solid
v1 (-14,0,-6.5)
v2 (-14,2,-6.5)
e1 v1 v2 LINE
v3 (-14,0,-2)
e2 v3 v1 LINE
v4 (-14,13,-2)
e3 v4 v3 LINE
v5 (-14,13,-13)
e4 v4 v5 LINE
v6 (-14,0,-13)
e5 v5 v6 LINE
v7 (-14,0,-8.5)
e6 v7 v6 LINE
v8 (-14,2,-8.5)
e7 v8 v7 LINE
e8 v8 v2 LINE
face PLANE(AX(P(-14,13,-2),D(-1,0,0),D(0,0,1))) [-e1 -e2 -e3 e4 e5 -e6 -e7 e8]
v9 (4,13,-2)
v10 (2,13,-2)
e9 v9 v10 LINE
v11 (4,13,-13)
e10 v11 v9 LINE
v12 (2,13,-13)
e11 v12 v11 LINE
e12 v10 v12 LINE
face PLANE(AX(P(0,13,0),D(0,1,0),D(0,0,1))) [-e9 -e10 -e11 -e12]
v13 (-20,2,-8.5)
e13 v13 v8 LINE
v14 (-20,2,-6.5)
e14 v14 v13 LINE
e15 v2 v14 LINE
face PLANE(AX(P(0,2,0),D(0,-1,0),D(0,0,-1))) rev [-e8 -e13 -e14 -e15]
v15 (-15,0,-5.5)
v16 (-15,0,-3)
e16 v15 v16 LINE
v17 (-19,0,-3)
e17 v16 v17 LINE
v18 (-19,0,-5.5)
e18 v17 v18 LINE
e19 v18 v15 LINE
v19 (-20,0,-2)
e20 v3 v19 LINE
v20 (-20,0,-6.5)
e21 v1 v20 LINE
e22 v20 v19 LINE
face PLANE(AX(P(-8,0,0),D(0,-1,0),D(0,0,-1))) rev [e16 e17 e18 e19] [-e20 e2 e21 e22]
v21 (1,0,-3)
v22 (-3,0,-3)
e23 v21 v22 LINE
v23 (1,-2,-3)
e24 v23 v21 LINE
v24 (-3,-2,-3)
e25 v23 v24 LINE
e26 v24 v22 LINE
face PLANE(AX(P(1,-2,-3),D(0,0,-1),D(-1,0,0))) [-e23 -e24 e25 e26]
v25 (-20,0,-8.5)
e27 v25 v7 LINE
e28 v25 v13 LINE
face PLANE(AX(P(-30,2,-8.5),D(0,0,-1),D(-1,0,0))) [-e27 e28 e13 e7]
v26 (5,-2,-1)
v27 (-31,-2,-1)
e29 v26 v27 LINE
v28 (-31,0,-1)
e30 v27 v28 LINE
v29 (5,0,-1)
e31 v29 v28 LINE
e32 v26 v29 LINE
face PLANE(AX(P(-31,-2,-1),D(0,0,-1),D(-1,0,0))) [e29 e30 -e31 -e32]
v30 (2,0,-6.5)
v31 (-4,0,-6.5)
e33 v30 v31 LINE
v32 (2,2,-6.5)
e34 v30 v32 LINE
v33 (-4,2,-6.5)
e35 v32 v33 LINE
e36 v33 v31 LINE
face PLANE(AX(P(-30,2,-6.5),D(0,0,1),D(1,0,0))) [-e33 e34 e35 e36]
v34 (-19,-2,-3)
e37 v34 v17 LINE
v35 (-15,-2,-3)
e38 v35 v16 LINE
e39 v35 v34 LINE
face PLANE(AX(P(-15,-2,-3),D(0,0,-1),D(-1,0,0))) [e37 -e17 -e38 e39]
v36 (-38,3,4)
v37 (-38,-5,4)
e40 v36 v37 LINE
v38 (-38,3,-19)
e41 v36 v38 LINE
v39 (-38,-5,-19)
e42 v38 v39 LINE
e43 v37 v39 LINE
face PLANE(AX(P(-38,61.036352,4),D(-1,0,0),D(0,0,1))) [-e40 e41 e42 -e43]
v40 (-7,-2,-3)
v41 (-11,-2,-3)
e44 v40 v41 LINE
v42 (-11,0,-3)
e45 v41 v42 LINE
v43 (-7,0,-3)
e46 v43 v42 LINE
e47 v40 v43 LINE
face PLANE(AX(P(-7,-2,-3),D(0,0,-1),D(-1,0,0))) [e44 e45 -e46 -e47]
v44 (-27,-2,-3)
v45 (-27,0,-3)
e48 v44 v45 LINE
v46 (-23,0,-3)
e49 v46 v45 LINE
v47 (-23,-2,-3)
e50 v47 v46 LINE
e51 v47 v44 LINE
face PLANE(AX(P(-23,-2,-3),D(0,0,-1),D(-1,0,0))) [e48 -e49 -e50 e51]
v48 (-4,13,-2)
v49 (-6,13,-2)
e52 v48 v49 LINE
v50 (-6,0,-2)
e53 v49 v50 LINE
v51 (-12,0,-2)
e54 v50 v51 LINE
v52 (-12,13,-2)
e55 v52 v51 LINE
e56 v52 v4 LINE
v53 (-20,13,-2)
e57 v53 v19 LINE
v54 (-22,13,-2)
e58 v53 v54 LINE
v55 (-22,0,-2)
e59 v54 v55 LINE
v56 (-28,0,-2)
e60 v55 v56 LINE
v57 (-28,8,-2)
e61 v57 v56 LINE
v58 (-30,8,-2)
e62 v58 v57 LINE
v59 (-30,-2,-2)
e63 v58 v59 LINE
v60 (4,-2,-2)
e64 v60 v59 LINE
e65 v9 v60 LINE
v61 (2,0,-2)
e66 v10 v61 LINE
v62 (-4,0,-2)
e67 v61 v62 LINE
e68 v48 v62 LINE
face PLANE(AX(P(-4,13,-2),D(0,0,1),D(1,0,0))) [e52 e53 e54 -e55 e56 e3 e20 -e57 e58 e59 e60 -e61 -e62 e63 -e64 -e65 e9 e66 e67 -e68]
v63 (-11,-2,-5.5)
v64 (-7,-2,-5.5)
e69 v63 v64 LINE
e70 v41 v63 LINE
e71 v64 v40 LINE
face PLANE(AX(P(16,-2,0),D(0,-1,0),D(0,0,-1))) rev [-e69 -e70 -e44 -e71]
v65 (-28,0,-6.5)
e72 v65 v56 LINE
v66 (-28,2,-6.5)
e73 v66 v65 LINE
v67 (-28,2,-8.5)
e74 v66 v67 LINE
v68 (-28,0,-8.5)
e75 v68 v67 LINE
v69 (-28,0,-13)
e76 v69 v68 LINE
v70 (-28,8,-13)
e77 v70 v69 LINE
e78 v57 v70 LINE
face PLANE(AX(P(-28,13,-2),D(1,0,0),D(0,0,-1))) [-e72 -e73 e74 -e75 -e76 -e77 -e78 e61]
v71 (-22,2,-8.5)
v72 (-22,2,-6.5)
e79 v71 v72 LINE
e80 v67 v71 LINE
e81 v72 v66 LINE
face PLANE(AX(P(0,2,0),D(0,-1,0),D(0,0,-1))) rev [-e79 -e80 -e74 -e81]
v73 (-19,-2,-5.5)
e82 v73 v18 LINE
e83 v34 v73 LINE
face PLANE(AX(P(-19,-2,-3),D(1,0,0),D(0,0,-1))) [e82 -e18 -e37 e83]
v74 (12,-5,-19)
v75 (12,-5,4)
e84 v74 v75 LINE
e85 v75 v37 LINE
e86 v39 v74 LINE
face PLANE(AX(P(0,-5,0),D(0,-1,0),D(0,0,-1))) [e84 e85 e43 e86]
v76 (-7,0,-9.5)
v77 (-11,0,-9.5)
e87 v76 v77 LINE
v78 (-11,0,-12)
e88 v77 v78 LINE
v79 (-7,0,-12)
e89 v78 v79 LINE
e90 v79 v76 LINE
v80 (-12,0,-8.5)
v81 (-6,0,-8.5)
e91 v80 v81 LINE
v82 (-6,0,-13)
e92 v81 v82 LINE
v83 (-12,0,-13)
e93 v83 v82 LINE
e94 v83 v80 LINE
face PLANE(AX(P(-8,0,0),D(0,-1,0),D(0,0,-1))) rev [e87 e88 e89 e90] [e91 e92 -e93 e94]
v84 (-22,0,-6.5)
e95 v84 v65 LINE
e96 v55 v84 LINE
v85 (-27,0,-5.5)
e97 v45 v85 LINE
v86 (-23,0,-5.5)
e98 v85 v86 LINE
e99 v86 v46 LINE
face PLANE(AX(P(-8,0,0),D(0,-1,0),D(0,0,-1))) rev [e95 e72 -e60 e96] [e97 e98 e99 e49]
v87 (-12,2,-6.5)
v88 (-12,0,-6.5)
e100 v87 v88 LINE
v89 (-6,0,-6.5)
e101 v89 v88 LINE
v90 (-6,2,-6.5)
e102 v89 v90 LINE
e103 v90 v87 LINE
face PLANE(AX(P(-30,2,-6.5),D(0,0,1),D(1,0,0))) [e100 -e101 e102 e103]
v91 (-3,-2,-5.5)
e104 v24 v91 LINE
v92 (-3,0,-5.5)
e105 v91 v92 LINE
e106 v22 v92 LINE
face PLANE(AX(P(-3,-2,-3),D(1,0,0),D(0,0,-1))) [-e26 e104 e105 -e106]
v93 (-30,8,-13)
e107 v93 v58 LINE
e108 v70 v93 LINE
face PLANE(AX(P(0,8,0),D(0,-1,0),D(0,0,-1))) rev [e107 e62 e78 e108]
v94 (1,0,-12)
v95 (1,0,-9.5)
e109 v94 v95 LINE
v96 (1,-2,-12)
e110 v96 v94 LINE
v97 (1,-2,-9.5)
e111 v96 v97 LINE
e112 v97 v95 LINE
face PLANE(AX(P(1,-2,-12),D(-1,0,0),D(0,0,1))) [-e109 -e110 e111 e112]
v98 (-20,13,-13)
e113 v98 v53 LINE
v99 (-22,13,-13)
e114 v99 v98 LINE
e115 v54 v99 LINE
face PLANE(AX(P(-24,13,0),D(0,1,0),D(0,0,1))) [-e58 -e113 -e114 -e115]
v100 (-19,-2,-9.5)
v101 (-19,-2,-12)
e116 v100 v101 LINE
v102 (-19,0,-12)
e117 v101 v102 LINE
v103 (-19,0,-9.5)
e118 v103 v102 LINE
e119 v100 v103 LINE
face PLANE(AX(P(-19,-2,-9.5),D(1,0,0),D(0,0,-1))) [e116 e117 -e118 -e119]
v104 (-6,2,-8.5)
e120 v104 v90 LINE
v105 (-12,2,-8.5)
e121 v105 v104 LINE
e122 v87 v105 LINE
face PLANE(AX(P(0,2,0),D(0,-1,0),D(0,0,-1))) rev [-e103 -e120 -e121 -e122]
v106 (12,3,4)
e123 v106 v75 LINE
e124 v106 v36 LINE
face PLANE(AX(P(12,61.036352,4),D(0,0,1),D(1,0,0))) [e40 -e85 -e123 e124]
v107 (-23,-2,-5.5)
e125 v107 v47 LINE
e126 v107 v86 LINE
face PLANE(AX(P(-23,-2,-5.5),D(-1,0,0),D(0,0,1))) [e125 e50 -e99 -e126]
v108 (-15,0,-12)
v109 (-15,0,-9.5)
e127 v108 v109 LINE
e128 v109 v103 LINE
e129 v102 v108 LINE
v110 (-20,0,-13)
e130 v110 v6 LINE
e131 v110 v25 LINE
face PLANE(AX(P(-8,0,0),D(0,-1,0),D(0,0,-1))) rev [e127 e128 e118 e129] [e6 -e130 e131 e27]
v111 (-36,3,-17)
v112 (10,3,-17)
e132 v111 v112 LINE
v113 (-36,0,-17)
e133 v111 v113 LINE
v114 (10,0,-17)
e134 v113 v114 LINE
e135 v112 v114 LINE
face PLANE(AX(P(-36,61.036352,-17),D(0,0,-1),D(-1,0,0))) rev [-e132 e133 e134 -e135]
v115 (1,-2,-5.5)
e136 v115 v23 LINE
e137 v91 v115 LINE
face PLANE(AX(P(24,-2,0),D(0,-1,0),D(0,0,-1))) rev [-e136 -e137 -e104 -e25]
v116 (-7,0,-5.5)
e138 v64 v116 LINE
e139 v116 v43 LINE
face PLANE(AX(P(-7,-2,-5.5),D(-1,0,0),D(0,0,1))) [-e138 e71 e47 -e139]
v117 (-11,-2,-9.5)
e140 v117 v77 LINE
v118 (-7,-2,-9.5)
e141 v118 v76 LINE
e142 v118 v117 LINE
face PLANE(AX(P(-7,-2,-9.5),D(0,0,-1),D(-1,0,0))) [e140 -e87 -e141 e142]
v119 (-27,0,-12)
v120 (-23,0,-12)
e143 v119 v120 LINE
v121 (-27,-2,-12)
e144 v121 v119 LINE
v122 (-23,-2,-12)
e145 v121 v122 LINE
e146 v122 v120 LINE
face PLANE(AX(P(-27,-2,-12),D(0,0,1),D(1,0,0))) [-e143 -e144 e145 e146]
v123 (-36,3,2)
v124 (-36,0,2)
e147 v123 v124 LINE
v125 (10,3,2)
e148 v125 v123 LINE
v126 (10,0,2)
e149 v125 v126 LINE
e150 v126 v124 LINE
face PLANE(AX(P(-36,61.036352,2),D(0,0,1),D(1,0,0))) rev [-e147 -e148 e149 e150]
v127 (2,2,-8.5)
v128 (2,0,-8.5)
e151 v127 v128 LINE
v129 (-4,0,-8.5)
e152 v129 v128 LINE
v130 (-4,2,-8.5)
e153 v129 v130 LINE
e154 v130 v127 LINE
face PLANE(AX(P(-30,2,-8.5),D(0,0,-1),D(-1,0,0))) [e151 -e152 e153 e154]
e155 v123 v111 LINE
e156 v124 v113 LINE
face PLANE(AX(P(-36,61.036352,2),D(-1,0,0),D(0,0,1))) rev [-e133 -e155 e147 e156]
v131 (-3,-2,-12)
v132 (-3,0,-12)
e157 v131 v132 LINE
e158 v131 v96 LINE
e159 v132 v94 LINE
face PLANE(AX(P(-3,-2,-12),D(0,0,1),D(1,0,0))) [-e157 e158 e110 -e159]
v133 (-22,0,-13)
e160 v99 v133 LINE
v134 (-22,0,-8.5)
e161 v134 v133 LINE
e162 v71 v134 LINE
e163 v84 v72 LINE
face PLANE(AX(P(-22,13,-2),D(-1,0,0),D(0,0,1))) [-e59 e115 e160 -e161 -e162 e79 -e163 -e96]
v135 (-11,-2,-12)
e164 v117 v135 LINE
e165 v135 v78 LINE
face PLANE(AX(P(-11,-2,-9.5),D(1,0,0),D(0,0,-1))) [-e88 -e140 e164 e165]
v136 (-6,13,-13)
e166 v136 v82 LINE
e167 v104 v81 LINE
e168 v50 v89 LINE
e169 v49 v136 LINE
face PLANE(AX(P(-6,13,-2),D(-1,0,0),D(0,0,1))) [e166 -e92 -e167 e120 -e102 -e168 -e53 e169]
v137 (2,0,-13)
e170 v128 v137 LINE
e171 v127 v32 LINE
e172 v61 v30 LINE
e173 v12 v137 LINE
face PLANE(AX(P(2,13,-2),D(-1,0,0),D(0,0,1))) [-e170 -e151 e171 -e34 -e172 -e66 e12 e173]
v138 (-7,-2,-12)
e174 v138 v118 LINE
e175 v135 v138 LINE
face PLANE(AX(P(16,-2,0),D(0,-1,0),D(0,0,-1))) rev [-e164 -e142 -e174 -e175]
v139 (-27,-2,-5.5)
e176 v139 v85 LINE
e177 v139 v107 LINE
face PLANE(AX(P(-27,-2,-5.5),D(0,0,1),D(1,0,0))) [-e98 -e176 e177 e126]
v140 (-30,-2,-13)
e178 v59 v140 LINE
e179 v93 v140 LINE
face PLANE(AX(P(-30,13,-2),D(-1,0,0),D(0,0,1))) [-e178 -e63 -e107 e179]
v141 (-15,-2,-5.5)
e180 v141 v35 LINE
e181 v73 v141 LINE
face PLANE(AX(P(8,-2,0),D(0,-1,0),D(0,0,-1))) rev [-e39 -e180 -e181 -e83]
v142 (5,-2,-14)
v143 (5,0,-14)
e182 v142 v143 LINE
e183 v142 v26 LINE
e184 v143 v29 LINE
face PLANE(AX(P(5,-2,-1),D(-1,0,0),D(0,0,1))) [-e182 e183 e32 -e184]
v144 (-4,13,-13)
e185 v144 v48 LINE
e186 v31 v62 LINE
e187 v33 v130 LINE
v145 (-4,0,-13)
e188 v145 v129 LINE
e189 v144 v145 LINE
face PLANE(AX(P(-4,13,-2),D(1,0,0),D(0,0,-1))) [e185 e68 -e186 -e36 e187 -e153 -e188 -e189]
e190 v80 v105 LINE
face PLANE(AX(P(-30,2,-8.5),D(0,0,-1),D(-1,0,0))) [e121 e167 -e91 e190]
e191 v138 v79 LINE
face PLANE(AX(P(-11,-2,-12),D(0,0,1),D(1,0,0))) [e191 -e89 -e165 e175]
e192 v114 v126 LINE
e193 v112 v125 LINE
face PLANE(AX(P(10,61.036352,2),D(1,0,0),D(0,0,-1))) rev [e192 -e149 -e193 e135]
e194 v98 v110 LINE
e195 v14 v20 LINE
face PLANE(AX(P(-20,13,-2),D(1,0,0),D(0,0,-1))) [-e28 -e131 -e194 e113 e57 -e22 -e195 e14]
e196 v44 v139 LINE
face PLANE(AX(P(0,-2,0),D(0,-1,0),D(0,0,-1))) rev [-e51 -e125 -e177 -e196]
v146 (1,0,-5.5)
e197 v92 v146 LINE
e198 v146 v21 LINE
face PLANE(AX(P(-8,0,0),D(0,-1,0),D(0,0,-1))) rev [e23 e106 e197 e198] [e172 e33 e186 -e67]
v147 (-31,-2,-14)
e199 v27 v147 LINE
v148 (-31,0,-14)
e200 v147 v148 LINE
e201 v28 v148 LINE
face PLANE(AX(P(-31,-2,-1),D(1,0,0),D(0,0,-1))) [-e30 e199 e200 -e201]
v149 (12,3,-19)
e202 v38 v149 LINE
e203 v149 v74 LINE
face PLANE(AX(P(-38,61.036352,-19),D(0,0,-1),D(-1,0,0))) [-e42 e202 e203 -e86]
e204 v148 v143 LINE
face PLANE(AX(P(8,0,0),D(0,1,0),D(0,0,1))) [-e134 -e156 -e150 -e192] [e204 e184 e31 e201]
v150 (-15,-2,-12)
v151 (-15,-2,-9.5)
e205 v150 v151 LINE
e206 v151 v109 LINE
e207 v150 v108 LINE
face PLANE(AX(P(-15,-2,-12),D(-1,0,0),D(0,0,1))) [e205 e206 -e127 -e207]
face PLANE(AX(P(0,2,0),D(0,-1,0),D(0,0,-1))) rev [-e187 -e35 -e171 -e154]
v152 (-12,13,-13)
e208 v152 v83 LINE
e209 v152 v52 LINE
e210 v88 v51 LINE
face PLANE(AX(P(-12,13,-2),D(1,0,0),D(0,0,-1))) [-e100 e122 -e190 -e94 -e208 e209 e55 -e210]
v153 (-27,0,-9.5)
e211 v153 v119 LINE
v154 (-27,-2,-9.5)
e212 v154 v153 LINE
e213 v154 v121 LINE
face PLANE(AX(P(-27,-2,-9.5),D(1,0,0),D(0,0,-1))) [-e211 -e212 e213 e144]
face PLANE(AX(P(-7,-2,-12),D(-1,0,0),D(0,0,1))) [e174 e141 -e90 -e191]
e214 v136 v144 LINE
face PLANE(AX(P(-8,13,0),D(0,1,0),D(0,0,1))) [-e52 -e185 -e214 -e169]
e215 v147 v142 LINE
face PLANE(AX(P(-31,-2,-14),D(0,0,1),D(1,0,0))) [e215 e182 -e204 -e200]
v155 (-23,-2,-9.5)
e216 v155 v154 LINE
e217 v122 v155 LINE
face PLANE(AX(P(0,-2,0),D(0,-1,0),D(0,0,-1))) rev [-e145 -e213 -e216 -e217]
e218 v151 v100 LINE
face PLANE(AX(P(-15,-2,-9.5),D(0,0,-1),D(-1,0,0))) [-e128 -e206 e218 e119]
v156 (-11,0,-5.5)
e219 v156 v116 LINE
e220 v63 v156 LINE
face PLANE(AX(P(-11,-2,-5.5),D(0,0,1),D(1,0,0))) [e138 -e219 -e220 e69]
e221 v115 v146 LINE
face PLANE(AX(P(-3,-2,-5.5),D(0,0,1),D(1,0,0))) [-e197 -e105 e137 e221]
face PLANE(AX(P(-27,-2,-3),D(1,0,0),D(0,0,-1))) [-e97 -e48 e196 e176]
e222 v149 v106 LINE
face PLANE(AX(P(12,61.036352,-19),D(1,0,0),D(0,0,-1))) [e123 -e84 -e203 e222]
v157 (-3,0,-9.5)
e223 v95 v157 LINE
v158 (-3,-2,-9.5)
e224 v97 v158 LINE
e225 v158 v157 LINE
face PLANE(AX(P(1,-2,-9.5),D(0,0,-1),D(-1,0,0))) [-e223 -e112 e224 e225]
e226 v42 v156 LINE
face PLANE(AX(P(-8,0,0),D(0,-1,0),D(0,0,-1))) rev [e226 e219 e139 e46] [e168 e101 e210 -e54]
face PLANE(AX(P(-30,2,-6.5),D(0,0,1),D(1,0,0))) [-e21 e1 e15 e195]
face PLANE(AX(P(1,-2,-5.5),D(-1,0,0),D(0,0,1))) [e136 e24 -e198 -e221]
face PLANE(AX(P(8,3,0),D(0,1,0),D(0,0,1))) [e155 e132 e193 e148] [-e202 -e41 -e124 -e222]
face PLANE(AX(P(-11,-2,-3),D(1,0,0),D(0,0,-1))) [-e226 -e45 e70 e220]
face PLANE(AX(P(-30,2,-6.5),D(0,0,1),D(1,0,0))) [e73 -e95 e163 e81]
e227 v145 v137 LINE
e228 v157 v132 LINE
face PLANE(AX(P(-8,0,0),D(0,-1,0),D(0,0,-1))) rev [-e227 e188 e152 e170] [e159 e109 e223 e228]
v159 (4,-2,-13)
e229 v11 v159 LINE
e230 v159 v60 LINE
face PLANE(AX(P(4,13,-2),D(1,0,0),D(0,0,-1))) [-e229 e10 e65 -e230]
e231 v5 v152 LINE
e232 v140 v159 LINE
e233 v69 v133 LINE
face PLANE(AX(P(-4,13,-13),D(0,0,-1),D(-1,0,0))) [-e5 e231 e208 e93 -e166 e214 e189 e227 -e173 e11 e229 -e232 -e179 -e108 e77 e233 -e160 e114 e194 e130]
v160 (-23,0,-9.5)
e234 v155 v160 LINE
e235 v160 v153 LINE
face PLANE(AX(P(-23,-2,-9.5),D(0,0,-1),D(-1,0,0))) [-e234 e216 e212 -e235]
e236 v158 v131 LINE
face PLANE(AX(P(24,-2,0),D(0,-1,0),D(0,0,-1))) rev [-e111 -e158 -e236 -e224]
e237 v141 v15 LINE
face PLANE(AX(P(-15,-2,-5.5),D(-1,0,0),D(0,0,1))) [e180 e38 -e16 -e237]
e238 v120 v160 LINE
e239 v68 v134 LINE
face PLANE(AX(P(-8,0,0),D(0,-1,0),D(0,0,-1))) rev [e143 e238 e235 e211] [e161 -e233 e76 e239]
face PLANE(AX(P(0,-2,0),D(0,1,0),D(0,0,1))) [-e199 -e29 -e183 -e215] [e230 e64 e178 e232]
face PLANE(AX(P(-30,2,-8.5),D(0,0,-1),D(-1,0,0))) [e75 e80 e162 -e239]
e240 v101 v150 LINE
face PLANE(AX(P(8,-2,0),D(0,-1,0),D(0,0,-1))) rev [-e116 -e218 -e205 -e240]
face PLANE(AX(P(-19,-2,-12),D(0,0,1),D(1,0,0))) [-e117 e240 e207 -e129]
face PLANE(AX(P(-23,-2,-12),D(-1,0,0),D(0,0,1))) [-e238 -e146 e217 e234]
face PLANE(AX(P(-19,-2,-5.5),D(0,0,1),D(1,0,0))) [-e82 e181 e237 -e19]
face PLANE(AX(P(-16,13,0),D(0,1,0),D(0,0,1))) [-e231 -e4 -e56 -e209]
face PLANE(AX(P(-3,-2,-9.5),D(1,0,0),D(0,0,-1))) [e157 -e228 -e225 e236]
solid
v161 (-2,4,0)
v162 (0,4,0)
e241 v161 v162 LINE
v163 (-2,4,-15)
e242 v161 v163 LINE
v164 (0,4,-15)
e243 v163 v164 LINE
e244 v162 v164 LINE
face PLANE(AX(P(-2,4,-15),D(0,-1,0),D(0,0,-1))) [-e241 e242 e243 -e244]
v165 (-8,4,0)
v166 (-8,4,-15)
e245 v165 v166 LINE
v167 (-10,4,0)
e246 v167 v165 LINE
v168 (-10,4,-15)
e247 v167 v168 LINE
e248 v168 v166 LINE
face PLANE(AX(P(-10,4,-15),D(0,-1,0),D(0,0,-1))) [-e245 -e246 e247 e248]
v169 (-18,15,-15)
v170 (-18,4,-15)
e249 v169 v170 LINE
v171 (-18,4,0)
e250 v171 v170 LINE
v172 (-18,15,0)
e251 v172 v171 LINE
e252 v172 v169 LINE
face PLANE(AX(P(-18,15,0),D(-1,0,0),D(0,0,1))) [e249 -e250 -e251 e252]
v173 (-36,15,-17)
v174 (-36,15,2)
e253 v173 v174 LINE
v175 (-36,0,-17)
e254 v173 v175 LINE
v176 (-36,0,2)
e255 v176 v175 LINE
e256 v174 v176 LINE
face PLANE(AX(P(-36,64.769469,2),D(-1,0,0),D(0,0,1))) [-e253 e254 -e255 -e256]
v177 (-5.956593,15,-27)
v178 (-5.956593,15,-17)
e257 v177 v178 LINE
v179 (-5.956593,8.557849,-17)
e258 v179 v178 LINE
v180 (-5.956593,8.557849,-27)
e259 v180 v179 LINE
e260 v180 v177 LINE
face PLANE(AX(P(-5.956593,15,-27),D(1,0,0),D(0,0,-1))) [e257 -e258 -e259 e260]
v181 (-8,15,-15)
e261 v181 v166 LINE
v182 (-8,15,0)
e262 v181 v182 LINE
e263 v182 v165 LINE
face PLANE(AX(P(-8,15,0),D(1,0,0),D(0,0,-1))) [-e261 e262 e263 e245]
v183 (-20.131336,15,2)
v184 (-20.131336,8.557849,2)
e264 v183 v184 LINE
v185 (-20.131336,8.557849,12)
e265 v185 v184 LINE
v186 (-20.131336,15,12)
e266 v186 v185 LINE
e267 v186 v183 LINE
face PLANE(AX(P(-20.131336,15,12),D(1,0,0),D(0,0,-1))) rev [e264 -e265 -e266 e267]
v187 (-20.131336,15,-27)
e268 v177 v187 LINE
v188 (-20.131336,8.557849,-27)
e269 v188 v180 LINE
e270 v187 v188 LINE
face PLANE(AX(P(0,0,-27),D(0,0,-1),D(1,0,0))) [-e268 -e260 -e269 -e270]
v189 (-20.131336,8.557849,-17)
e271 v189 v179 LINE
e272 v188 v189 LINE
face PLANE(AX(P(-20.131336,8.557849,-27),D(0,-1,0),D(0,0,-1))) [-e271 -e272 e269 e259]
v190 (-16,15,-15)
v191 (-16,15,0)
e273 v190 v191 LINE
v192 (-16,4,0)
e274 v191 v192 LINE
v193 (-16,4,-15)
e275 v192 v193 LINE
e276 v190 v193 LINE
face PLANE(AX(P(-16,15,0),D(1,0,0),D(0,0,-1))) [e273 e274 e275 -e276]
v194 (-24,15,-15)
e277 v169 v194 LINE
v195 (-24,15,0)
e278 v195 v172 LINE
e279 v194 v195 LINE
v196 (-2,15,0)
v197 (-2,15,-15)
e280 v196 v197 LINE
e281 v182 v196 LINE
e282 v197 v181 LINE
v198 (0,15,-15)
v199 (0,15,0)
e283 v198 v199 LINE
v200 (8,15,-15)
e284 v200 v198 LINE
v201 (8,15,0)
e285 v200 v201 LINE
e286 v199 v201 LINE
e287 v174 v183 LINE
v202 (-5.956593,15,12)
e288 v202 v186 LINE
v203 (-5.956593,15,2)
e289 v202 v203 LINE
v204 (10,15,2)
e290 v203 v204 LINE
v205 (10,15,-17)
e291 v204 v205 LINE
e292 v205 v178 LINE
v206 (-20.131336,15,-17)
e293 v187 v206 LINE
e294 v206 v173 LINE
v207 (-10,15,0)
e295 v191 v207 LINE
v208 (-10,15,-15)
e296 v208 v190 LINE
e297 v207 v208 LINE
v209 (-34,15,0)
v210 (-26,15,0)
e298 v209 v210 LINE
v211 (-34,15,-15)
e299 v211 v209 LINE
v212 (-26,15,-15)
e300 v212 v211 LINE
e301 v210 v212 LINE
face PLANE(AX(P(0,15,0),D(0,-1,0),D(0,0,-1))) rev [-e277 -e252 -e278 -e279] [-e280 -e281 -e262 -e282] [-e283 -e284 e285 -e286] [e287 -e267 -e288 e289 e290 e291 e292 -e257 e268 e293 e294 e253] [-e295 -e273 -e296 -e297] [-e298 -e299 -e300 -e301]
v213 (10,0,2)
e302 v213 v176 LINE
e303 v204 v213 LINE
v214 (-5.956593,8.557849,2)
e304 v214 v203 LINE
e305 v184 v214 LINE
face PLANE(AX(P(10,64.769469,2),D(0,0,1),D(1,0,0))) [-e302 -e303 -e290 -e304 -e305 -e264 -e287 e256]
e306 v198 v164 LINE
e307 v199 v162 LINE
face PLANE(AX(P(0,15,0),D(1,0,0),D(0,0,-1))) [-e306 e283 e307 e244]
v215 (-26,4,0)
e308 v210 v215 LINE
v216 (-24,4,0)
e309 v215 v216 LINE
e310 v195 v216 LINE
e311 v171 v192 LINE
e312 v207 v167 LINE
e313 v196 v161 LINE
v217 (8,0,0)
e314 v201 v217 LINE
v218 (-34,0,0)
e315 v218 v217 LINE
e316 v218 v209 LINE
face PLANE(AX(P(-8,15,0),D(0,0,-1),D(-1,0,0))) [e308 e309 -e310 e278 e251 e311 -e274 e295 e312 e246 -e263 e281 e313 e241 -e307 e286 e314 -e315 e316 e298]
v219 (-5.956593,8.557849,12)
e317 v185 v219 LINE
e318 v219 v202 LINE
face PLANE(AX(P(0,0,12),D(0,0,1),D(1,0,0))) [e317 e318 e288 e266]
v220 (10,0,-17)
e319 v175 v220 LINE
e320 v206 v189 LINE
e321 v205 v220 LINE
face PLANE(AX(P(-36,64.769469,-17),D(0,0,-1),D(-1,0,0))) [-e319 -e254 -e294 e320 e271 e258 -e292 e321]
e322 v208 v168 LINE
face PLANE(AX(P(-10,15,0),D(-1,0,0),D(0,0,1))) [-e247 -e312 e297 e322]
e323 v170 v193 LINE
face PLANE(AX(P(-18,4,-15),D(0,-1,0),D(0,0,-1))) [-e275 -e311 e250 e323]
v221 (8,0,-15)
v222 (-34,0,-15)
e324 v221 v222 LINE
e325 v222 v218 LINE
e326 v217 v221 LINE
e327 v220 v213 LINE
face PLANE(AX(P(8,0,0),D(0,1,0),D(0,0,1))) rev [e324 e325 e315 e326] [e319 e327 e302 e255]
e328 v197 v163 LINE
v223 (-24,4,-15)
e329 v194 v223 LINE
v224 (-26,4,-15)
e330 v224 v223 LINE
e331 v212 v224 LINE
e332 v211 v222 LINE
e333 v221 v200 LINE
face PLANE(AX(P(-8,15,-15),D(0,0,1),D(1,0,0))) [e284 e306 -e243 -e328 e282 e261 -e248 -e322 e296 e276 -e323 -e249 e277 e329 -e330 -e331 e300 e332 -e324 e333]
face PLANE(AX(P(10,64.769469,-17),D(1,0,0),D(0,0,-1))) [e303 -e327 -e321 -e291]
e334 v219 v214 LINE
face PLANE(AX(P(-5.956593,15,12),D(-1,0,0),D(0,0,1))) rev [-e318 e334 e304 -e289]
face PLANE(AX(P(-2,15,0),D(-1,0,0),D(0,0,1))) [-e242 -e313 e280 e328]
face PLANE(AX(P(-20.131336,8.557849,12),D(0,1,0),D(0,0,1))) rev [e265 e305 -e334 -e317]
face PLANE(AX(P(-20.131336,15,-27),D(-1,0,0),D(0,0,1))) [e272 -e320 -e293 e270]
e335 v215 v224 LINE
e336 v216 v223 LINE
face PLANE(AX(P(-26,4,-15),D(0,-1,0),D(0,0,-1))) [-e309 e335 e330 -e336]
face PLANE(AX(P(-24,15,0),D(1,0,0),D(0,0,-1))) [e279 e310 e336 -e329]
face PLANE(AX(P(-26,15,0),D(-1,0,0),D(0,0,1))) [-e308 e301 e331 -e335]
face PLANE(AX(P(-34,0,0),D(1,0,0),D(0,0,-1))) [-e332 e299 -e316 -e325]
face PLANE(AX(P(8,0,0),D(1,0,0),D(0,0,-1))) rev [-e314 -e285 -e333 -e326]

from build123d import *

# Parameters (mm, degrees)
SKETCH1_W                 = 6
SKETCH1_H                 = 15
BOSS_EXTRUDE1_DEPTH       = 15
SKETCH2_W                 = 2
SKETCH2_H                 = 11
CUT_EXTRUDE1_DEPTH        = 13
SKETCH3_W                 = 15
SKETCH3_H                 = 4
BOSS_EXTRUDE2_DEPTH       = 2
LPATTERN1_COUNT           = 5
LPATTERN1_PITCH           = 8
SKETCH6_W                 = 15
SKETCH6_H                 = 15
BOSS_EXTRUDE4_DEPTH       = 2
SKETCH8_W                 = 15
SKETCH8_H                 = 11
BOSS_EXTRUDE5_DEPTH       = 2
SKETCH9_W                 = 34
SKETCH9_H                 = 2
CUT_EXTRUDE2_DEPTH        = 2
SKETCH13_W                = 36
SKETCH13_H                = 13
SKETCH13_W_2              = 34
SKETCH13_H_2              = 11
BOSS_EXTRUDE9_DEPTH       = 2
SKETCH15_W                = 4
SKETCH15_H                = 2.5
BOSS_EXTRUDE10_DEPTH      = 2
LPATTERN2_COUNT           = 4
LPATTERN2_PITCH           = 8
BOSS_EXTRUDE11_DEPTH      = 5
BOSS_EXTRUDE11_DEPTH_BACK = 15
SKETCH17_W                = 46
SKETCH17_H                = 19
SPLIT2_START              = -5
SPLIT2_OUTLINE_W          = 46
SPLIT2_OUTLINE_H          = 19
SPLIT2_DEPTH              = 5
SPLIT2_2_OUTLINE_W        = 2
SPLIT2_2_OUTLINE_H        = 11
SPLIT2_2_DEPTH            = 13
SPLIT2_3_OUTLINE_W        = 6
SPLIT2_3_OUTLINE_H        = 2
SPLIT2_3_DEPTH            = 2
SPLIT2_START_2            = -13
SPLIT2_4_DEPTH            = 11
SPLIT2_START_3            = -17
SPLIT2_5_DEPTH            = 19
SPLIT2_6_OUTLINE_W        = 36
SPLIT2_6_OUTLINE_H        = 2
SPLIT2_6_DEPTH            = 3
SPLIT2_START_4            = -1
SPLIT2_7_OUTLINE_W        = 36
SPLIT2_7_OUTLINE_H        = 2
SPLIT2_7_DEPTH            = 3
SPLIT2_START_5            = -8.5
SPLIT2_8_DEPTH            = 2
SPLIT2_START_6            = -9.5
SPLIT2_9_OUTLINE_W        = 4
SPLIT2_9_OUTLINE_H        = 2
SPLIT2_9_DEPTH            = 4
SPLIT2_10_OUTLINE_W       = 4
SPLIT2_10_OUTLINE_H       = 2
SPLIT2_10_DEPTH           = 1
SPLIT2_START_7            = -3
SPLIT2_11_OUTLINE_W       = 4
SPLIT2_11_OUTLINE_H       = 2
SPLIT2_11_DEPTH           = 1
SKETCH18_W                = 14.174743238
SKETCH18_H                = 6.442150942
BOSS_EXTRUDE12_DEPTH      = 10
SKETCH19_W                = 50
SKETCH19_H                = 23
SKETCH19_W_2              = 46
SKETCH19_H_2              = 19
BOSS_EXTRUDE13_DEPTH      = 8
SKETCH20_W                = 2
SKETCH20_H                = 11
CUT_EXTRUDE3_DEPTH        = 5


# Read off the part's stored shape, not the designer's step: Split2
with BuildPart() as part:
    # Sketch1 → Boss-Extrude1 (new body)
    with BuildSketch(Plane(origin=(0, 0, 0), x_dir=(1, 0, 0), z_dir=(0, 1, 0))):
        with Locations((3, 7.5)):
            Rectangle(SKETCH1_W, SKETCH1_H)
    extrude(amount=BOSS_EXTRUDE1_DEPTH)

    # Sketch2 → Cut-Extrude1 (cut)
    with BuildSketch(Plane.XZ):
        with Locations((3, -7.5)):
            Rectangle(SKETCH2_W, SKETCH2_H)
    extrude(amount=-CUT_EXTRUDE1_DEPTH, mode=Mode.SUBTRACT)

    # Sketch3 → Boss-Extrude2 (add)
    with BuildSketch(Plane.ZY):
        with Locations((-7.5, 2)):
            Rectangle(SKETCH3_W, SKETCH3_H)
    extrude(amount=BOSS_EXTRUDE2_DEPTH)


with BuildPart() as lpattern1_1:
    # LPattern1: pattern copy
    add(part.part.moved(Location(Vector(-1, 0, 0) * (1 * LPATTERN1_PITCH))))


with BuildPart() as lpattern1_2:
    # LPattern1: pattern copy
    add(part.part.moved(Location(Vector(-1, 0, 0) * (2 * LPATTERN1_PITCH))))


with BuildPart() as lpattern1_3:
    # LPattern1: pattern copy
    add(part.part.moved(Location(Vector(-1, 0, 0) * (3 * LPATTERN1_PITCH))))


with BuildPart() as lpattern1_4:
    # LPattern1: pattern copy
    add(part.part.moved(Location(Vector(-1, 0, 0) * (4 * LPATTERN1_PITCH))))


with BuildPart() as lpattern1_1_1:
    add(lpattern1_1.part)

    # Combine1: union LPattern1_2, LPattern1_3, part, LPattern1_4
    add(lpattern1_2.part)
    add(lpattern1_3.part)
    add(part.part)
    add(lpattern1_4.part)

    # Sketch6 → Boss-Extrude4 (add)
    with BuildSketch(Plane(origin=(6, 0, 0), x_dir=(0, 0, -1), z_dir=(1, 0, 0))):
        with Locations((7.5, 7.5)):
            Rectangle(SKETCH6_W, SKETCH6_H)
    extrude(amount=BOSS_EXTRUDE4_DEPTH)

    # Sketch8 → Boss-Extrude5 (add)
    with BuildSketch(Plane.ZY.offset(32)):
        with Locations((-7.5, 9.5)):
            Rectangle(SKETCH8_W, SKETCH8_H)
    extrude(amount=BOSS_EXTRUDE5_DEPTH)

    # Sketch9 → Cut-Extrude2 (cut)
    with BuildSketch(Plane.XZ):
        with Locations((-13, -7.5)):
            Rectangle(SKETCH9_W, SKETCH9_H)
    extrude(amount=-CUT_EXTRUDE2_DEPTH, mode=Mode.SUBTRACT)

    # Sketch13 → Boss-Extrude9 (add)
    with BuildSketch(Plane(origin=(0, 0, 0), x_dir=(-1, 0, 0), z_dir=(0, -1, 0))):
        with Locations((13, 7.5)):
            Rectangle(SKETCH13_W, SKETCH13_H)
        with Locations((13, 7.5)):
            Rectangle(SKETCH13_W_2, SKETCH13_H_2, mode=Mode.SUBTRACT)
    extrude(amount=BOSS_EXTRUDE9_DEPTH)

    # Sketch15 → Boss-Extrude10 (add)
    with BuildSketch(Plane(origin=(0, 0, 0), x_dir=(-1, 0, 0), z_dir=(0, -1, 0))):
        with Locations((25, 4.25)):
            Rectangle(SKETCH15_W, SKETCH15_H)
        with Locations((25, 10.75)):
            Rectangle(SKETCH15_W, SKETCH15_H)
    boss_extrude10 = extrude(amount=BOSS_EXTRUDE10_DEPTH)

    # LPattern2: Boss-Extrude10 ×4
    with Locations(*[(i * LPATTERN2_PITCH, 0, 0) for i in range(1, LPATTERN2_COUNT)]):
        add(boss_extrude10)


with BuildPart() as body_2:
    # Sketch17 → Boss-Extrude11 (new, two sides: drawn at the far end of the back side and taken through both)
    with BuildSketch(Plane.XZ.offset(-BOSS_EXTRUDE11_DEPTH_BACK)):
        with Locations((-13, -7.5)):
            Rectangle(SKETCH17_W, SKETCH17_H)
    extrude(amount=BOSS_EXTRUDE11_DEPTH + BOSS_EXTRUDE11_DEPTH_BACK)

    # Combine3: cut LPattern1_1
    add(lpattern1_1_1.part, mode=Mode.SUBTRACT)

    # Split2 outline → Split2 (cut)
    with BuildSketch(Plane(origin=(0, 0, 0), x_dir=(1, 0, 0), z_dir=(0, 1, 0)).offset(SPLIT2_START)):
        with Locations((-13, 7.5)):
            Rectangle(SPLIT2_OUTLINE_W, SPLIT2_OUTLINE_H)
    extrude(amount=SPLIT2_DEPTH, mode=Mode.SUBTRACT)

    # Split2 2 outline → Split2 2 (cut)
    with BuildSketch(Plane(origin=(0, 0, 0), x_dir=(1, 0, 0), z_dir=(0, 1, 0))):
        with Locations((3, 7.5)):
            Rectangle(SPLIT2_2_OUTLINE_W, SPLIT2_2_OUTLINE_H)
        with Locations((-5, 7.5)):
            Rectangle(SPLIT2_2_OUTLINE_W, SPLIT2_2_OUTLINE_H)
        with Locations((-13, 7.5)):
            Rectangle(SPLIT2_2_OUTLINE_W, SPLIT2_2_OUTLINE_H)
        with Locations((-21, 7.5)):
            Rectangle(SPLIT2_2_OUTLINE_W, SPLIT2_2_OUTLINE_H)
        with Locations((-29, 7.5)):
            Rectangle(SPLIT2_2_OUTLINE_W, SPLIT2_2_OUTLINE_H)
    extrude(amount=SPLIT2_2_DEPTH, mode=Mode.SUBTRACT)

    # Split2 3 outline → Split2 3 (cut)
    with BuildSketch(Plane(origin=(0, 0, 0), x_dir=(1, 0, 0), z_dir=(0, 1, 0))):
        with Locations((-1, 7.5)):
            Rectangle(SPLIT2_3_OUTLINE_W, SPLIT2_3_OUTLINE_H)
        with Locations((-9, 7.5)):
            Rectangle(SPLIT2_3_OUTLINE_W, SPLIT2_3_OUTLINE_H)
        with Locations((-17, 7.5)):
            Rectangle(SPLIT2_3_OUTLINE_W, SPLIT2_3_OUTLINE_H)
        with Locations((-25, 7.5)):
            Rectangle(SPLIT2_3_OUTLINE_W, SPLIT2_3_OUTLINE_H)
    extrude(amount=SPLIT2_3_DEPTH, mode=Mode.SUBTRACT)

    # Sketch18 → Boss-Extrude12 (add)
    with BuildSketch(Plane.XY.offset(2)):
        with Locations((-13.043964225, 11.778924529)):
            Rectangle(SKETCH18_W, SKETCH18_H)
    boss_extrude12 = extrude(amount=BOSS_EXTRUDE12_DEPTH)

    # Mirror2: Boss-Extrude12 across plane
    add(boss_extrude12.mirror(Plane.XY.offset(-7.5)))


with BuildPart() as body_2_2:
    # Split2 4 outline → Split2 4 (new body)
    with BuildSketch(Plane.XY.offset(SPLIT2_START_2)):
        Polygon((-4, 0), (-4, 13), (-6, 13), (-6, 0), (-7, 0), (-7, -2), (-11, -2), (-11, 0), (-12, 0), (-12, 13), (-14, 13), (-14, 0), (-15, 0), (-15, -2), (-19, -2), (-19, 0), (-20, 0), (-20, 13), (-22, 13), (-22, 0), (-23, 0), (-23, -2), (-27, -2), (-27, 0), (-28, 0), (-28, 13), (-30, 13), (-30, -2), (-31, -2), (-31, 0), (-36, 0), (-36, -5), (10, -5), (10, 0), (5, 0), (5, -2), (4, -2), (4, 13), (2, 13), (2, 0), (1, 0), (1, -2), (-3, -2), (-3, 0), align=None)
    extrude(amount=SPLIT2_4_DEPTH)

    # Split2 5 outline → Split2 5 (add)
    with BuildSketch(Plane.XY.offset(SPLIT2_START_3)):
        Polygon((5, -2), (-31, -2), (-31, 0), (-36, 0), (-36, -5), (10, -5), (10, 0), (5, 0), align=None)
    extrude(amount=SPLIT2_5_DEPTH)

    # Split2 6 outline → Split2 6 (add)
    with BuildSketch(Plane.XY.offset(SPLIT2_START_3)):
        with Locations((-13, -1)):
            Rectangle(SPLIT2_6_OUTLINE_W, SPLIT2_6_OUTLINE_H)
    extrude(amount=SPLIT2_6_DEPTH)

    # Split2 7 outline → Split2 7 (add)
    with BuildSketch(Plane.XY.offset(SPLIT2_START_4)):
        with Locations((-13, -1)):
            Rectangle(SPLIT2_7_OUTLINE_W, SPLIT2_7_OUTLINE_H)
    extrude(amount=SPLIT2_7_DEPTH)

    # Split2 8 outline → Split2 8 (add)
    with BuildSketch(Plane.XY.offset(SPLIT2_START_5)):
        Polygon((2, 2), (-4, 2), (-4, 0), (-3, 0), (-3, -2), (1, -2), (1, 0), (2, 0), align=None)
        Polygon((-7, 0), (-6, 0), (-6, 2), (-12, 2), (-12, 0), (-11, 0), (-11, -2), (-7, -2), align=None)
        Polygon((-19, -2), (-15, -2), (-15, 0), (-14, 0), (-14, 2), (-20, 2), (-20, 0), (-19, 0), align=None)
        Polygon((-27, -2), (-23, -2), (-23, 0), (-22, 0), (-22, 2), (-28, 2), (-28, 0), (-27, 0), align=None)
    extrude(amount=SPLIT2_8_DEPTH)

    # Split2 9 outline → Split2 9 (add)
    with BuildSketch(Plane.XY.offset(SPLIT2_START_6)):
        with Locations((-1, -1)):
            Rectangle(SPLIT2_9_OUTLINE_W, SPLIT2_9_OUTLINE_H)
        with Locations((-9, -1)):
            Rectangle(SPLIT2_9_OUTLINE_W, SPLIT2_9_OUTLINE_H)
        with Locations((-17, -1)):
            Rectangle(SPLIT2_9_OUTLINE_W, SPLIT2_9_OUTLINE_H)
        with Locations((-25, -1)):
            Rectangle(SPLIT2_9_OUTLINE_W, SPLIT2_9_OUTLINE_H)
    extrude(amount=SPLIT2_9_DEPTH)

    # Split2 10 outline → Split2 10 (add)
    with BuildSketch(Plane.XY.offset(SPLIT2_START_2)):
        with Locations((-1, -1)):
            Rectangle(SPLIT2_10_OUTLINE_W, SPLIT2_10_OUTLINE_H)
        with Locations((-9, -1)):
            Rectangle(SPLIT2_10_OUTLINE_W, SPLIT2_10_OUTLINE_H)
        with Locations((-17, -1)):
            Rectangle(SPLIT2_10_OUTLINE_W, SPLIT2_10_OUTLINE_H)
        with Locations((-25, -1)):
            Rectangle(SPLIT2_10_OUTLINE_W, SPLIT2_10_OUTLINE_H)
    extrude(amount=SPLIT2_10_DEPTH)

    # Split2 11 outline → Split2 11 (add)
    with BuildSketch(Plane.XY.offset(SPLIT2_START_7)):
        with Locations((-1, -1)):
            Rectangle(SPLIT2_11_OUTLINE_W, SPLIT2_11_OUTLINE_H)
        with Locations((-9, -1)):
            Rectangle(SPLIT2_11_OUTLINE_W, SPLIT2_11_OUTLINE_H)
        with Locations((-17, -1)):
            Rectangle(SPLIT2_11_OUTLINE_W, SPLIT2_11_OUTLINE_H)
        with Locations((-25, -1)):
            Rectangle(SPLIT2_11_OUTLINE_W, SPLIT2_11_OUTLINE_H)
    extrude(amount=SPLIT2_11_DEPTH)

    # Sketch19 → Boss-Extrude13 (add)
    with BuildSketch(Plane.XZ.offset(5)):
        with Locations((-13, -7.5)):
            Rectangle(SKETCH19_W, SKETCH19_H)
        with Locations((-13, -7.5)):
            Rectangle(SKETCH19_W_2, SKETCH19_H_2, mode=Mode.SUBTRACT)
    extrude(amount=-BOSS_EXTRUDE13_DEPTH)

    # Sketch20 → Cut-Extrude3 (cut)
    with BuildSketch(Plane(origin=(0, 13, 0), x_dir=(1, 0, 0), z_dir=(0, 1, 0))):
        with Locations((-29, 7.5)):
            Rectangle(SKETCH20_W, SKETCH20_H)
    extrude(amount=-CUT_EXTRUDE3_DEPTH, mode=Mode.SUBTRACT)


solid = Compound([body_2.part, body_2_2.part])
